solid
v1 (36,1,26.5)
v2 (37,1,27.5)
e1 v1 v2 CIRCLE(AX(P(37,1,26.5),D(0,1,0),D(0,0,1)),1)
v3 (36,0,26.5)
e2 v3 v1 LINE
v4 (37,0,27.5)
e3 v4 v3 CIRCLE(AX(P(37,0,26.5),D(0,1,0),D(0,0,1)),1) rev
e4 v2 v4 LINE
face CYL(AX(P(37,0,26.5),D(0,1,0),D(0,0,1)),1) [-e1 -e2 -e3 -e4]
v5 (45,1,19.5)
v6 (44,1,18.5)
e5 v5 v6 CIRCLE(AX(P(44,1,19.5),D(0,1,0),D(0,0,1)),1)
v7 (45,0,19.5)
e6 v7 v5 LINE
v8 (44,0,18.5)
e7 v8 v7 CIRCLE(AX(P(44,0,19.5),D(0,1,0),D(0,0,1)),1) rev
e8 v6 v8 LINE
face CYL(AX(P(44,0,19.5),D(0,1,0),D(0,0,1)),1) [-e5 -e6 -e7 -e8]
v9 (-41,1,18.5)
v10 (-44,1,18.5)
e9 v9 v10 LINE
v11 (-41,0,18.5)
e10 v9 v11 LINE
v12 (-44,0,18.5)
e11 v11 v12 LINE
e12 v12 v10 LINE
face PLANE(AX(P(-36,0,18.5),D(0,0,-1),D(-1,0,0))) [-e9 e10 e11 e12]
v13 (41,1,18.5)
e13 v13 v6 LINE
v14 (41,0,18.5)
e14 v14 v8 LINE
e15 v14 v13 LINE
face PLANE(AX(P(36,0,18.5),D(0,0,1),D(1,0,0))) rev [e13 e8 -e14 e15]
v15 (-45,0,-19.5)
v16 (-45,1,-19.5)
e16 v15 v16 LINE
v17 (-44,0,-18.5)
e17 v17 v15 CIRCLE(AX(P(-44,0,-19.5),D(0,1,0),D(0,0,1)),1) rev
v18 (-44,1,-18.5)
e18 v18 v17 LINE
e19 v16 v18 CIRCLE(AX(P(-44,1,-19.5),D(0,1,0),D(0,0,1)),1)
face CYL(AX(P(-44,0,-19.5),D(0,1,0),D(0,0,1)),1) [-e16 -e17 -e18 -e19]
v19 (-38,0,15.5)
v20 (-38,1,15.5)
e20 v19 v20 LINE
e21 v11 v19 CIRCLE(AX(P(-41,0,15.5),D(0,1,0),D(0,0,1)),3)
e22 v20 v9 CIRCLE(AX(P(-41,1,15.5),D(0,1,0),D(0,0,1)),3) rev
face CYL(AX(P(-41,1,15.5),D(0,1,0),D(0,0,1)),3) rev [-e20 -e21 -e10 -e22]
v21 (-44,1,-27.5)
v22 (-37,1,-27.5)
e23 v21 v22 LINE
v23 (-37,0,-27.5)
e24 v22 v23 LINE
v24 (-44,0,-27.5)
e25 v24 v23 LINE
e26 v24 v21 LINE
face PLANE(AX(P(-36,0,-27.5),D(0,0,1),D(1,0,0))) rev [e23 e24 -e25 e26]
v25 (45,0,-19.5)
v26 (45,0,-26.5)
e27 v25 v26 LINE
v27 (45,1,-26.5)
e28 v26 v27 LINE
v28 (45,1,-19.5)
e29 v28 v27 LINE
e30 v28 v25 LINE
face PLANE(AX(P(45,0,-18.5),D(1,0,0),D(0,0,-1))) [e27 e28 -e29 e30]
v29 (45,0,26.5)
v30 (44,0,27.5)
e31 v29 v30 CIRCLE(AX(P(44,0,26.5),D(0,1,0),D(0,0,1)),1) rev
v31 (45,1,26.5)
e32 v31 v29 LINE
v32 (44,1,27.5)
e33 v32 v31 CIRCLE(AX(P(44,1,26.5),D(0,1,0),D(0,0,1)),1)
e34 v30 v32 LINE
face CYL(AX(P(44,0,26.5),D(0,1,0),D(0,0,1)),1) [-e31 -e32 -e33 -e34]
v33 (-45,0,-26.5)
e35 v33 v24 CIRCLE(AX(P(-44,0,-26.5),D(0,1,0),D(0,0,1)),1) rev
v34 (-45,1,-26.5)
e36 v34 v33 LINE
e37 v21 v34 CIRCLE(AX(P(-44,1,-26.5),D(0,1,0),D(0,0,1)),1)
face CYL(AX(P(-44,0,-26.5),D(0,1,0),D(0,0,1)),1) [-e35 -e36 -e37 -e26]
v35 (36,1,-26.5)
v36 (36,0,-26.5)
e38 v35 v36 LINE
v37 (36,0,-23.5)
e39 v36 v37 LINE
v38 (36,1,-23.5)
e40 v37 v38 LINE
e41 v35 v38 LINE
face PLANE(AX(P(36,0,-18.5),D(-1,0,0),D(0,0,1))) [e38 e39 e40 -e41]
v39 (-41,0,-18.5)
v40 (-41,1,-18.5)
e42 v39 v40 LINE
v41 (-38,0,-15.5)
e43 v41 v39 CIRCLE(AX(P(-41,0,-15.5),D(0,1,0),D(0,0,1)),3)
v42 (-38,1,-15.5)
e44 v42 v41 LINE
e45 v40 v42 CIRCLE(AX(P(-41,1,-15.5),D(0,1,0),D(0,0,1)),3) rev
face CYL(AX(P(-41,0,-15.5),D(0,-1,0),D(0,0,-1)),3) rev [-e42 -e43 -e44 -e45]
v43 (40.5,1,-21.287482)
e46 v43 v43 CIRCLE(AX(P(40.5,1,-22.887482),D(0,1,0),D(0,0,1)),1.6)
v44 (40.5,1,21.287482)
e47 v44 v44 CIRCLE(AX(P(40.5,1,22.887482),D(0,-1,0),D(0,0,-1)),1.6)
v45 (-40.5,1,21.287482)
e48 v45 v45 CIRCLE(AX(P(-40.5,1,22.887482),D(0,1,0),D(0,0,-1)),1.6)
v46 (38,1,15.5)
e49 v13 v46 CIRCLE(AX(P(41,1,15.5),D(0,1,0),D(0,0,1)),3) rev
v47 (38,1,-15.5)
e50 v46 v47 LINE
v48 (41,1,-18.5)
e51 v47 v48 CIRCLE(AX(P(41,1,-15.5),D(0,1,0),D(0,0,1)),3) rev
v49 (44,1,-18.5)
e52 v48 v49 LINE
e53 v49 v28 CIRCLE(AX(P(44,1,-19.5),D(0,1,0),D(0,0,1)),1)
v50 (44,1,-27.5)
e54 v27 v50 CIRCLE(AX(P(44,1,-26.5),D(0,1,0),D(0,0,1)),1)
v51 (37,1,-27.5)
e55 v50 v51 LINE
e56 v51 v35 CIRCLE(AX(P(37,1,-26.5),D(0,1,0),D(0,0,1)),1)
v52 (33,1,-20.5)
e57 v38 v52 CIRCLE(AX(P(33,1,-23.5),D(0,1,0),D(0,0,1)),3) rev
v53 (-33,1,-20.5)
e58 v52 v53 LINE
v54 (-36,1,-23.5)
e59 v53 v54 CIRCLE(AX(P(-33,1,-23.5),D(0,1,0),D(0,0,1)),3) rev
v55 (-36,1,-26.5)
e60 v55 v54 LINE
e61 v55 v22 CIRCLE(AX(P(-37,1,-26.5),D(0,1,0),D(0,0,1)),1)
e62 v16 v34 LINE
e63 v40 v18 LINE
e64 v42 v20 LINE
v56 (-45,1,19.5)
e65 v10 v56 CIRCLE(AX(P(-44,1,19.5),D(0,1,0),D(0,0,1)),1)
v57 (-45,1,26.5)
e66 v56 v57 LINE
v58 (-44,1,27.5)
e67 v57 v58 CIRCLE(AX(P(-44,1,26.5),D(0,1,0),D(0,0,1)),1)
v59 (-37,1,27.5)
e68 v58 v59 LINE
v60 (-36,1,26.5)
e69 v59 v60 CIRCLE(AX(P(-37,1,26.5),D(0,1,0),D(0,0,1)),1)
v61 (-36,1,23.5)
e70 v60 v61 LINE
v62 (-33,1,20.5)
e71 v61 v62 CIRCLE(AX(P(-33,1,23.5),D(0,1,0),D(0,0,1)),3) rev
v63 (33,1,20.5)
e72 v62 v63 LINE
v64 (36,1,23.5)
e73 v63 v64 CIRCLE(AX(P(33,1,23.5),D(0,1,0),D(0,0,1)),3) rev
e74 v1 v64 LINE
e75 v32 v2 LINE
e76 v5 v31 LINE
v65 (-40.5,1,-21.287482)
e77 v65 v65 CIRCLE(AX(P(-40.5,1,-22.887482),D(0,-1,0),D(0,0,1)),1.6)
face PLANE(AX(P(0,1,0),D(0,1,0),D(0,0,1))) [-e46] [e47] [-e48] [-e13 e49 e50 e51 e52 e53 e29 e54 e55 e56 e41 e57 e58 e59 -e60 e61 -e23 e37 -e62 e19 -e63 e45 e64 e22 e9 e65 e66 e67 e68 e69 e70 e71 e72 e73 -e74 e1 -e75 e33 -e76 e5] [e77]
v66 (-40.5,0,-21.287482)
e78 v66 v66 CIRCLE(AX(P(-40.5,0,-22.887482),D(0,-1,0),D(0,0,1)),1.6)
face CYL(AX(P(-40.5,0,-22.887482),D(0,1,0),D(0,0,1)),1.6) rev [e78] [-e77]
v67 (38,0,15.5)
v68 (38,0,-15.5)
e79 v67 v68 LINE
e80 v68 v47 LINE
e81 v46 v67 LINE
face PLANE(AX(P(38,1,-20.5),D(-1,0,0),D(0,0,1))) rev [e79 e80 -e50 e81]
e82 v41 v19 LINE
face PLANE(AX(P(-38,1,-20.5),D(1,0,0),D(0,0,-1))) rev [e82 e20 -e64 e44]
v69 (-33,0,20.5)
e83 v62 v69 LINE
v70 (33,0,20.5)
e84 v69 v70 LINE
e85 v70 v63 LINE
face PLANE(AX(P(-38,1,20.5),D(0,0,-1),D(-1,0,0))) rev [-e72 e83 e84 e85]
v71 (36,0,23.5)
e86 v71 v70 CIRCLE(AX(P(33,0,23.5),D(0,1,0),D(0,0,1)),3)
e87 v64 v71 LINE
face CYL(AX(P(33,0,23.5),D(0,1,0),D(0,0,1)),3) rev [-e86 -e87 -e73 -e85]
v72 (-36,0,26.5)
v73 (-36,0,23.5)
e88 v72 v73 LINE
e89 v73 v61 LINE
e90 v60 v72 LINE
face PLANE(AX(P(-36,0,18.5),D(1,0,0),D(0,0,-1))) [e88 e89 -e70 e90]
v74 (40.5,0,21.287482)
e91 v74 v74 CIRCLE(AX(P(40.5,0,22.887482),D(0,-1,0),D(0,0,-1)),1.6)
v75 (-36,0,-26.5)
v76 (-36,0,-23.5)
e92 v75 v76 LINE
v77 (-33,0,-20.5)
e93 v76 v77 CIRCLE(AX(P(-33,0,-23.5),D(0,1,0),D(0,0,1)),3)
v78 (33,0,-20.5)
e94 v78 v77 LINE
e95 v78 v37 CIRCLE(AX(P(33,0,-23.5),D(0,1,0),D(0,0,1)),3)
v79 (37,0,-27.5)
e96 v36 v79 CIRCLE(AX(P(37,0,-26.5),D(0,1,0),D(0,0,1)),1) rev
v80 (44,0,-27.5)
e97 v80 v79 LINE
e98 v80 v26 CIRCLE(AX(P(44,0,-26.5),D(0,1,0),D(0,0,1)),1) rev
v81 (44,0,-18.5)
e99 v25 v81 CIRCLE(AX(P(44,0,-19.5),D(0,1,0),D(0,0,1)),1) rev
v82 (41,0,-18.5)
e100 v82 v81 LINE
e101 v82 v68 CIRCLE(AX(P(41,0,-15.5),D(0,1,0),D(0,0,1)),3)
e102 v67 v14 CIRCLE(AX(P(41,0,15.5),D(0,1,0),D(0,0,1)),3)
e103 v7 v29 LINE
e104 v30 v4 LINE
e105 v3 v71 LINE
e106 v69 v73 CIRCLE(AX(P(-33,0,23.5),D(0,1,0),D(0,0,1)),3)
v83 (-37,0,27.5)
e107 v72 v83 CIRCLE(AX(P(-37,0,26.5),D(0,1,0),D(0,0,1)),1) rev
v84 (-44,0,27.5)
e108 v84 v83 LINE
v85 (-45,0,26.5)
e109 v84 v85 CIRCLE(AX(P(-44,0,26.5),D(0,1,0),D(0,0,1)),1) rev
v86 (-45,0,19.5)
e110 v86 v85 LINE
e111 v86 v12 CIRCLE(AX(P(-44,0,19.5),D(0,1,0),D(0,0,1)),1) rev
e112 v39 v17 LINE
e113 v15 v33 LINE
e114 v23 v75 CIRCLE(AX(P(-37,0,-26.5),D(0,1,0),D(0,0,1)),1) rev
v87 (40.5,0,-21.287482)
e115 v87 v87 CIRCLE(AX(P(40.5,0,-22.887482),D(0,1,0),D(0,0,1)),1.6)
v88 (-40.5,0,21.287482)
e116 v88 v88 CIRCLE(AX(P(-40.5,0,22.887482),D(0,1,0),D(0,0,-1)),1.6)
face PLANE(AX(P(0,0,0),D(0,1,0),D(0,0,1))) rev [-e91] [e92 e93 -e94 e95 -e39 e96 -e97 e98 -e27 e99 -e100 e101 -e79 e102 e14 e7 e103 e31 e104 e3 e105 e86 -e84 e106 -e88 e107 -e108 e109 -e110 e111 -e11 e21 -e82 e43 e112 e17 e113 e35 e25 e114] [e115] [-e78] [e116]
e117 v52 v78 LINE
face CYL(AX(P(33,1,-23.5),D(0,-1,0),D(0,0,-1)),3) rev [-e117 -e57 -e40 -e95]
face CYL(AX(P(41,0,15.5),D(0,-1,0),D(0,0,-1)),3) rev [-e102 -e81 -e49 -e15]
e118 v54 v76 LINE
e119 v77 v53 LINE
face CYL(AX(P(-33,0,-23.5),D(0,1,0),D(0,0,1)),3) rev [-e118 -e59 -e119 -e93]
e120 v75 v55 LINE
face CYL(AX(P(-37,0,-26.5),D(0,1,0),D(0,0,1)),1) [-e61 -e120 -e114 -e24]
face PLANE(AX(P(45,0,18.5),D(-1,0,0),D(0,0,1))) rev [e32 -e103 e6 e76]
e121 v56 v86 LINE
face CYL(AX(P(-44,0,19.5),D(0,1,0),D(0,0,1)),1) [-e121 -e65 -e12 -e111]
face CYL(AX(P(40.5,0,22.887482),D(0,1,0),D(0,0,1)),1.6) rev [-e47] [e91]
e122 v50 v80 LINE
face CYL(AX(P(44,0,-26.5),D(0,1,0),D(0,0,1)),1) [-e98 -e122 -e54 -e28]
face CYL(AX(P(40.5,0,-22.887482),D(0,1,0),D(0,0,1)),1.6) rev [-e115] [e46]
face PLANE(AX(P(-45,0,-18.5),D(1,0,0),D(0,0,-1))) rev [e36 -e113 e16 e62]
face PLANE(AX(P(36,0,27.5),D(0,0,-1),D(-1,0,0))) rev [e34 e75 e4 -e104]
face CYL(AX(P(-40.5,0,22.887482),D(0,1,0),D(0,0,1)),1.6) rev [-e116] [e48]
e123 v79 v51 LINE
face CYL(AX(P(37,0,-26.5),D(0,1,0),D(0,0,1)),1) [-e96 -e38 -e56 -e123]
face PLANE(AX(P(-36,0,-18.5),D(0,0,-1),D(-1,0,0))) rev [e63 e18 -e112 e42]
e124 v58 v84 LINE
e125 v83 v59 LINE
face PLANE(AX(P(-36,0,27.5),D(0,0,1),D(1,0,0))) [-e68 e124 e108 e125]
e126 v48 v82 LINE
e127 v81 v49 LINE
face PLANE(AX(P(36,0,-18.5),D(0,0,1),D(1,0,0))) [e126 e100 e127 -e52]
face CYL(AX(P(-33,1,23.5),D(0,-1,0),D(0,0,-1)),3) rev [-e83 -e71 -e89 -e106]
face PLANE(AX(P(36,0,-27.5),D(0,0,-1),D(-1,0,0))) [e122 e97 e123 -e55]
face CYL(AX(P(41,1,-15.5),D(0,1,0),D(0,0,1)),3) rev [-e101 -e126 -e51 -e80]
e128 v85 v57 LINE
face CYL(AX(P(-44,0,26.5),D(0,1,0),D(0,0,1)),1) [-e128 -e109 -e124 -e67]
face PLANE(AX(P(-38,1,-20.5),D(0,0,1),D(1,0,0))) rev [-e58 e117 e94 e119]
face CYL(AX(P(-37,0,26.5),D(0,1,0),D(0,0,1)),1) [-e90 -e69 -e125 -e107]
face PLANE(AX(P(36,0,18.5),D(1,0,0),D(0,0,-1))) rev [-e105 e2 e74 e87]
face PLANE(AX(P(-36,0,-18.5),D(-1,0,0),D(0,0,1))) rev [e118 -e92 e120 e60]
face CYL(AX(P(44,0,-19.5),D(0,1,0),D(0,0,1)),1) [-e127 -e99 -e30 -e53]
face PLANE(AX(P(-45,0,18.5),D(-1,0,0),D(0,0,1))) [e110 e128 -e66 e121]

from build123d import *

# Parameters (mm, degrees)
SKETCH1_W            = 76
SKETCH1_H            = 41
BOSS_EXTRUDE1_DEPTH  = 1
SKETCH2_W            = 9
SKETCH2_H            = 9
BOSS_EXTRUDE2_DEPTH  = 1
SKETCH3_R            = 1.6
CUT_EXTRUDE1_DEPTH   = 1
FILLET1_R            = 1
FILLET3_R            = 3
FILLET1_OF_MIRROR2_R = 1
MIRROR3_OUTLINE_R    = 1.6
MIRROR3_DEPTH        = 1
FILLET4_R            = 3


# Read off the part's stored shape, not the designer's step: Mirror3
with BuildPart() as part:
    # Sketch1 → Boss-Extrude1 (new body)
    with BuildSketch(Plane(origin=(0, 0, 0), x_dir=(1, 0, 0), z_dir=(0, 1, 0))):
        Rectangle(SKETCH1_W, SKETCH1_H)
    boss_extrude1 = extrude(amount=BOSS_EXTRUDE1_DEPTH)

    # Sketch2 → Boss-Extrude2 (add)
    with BuildSketch(Plane(origin=(0, 1, 0), x_dir=(1, 0, 0), z_dir=(0, 1, 0))):
        with Locations((40.5, 23)):
            Rectangle(SKETCH2_W, SKETCH2_H)
    boss_extrude2 = extrude(amount=-BOSS_EXTRUDE2_DEPTH)

    # Sketch3 → Cut-Extrude1 (cut)
    with BuildSketch(Plane(origin=(0, 1, 0), x_dir=(1, 0, 0), z_dir=(0, 1, 0))):
        with Locations(Location((40.5, 22.887482194, 0), (0, 0, 270))):
            Circle(SKETCH3_R)
    cut_extrude1 = extrude(amount=-CUT_EXTRUDE1_DEPTH, mode=Mode.SUBTRACT)

    # Fillet1
    fillet1_edges = [part.edges().sort_by_distance(p)[0] for p in [
        (45, 0.5, -18.5),
        (36, 0.5, -27.5),
        (45, 0.5, -27.5),
    ]]
    fillet(fillet1_edges, radius=FILLET1_R)

    # Fillet3
    fillet3_edges = [part.edges().sort_by_distance(p)[0] for p in [
        (36, 0.5, -20.5),
        (38, 0.5, -18.5),
    ]]
    fillet(fillet3_edges, radius=FILLET3_R)

    # Mirror2: Boss-Extrude1, Boss-Extrude2, Cut-Extrude1 across plane
    add(boss_extrude1.mirror(Plane.XY))
    add(boss_extrude2.mirror(Plane.XY))
    add(cut_extrude1.mirror(Plane.XY), mode=Mode.SUBTRACT)

    # Fillet1 of Mirror2
    fillet1_of_mirror2_edges = [part.edges().sort_by_distance(p)[0] for p in [
        (45, 0.5, 18.5),
        (36, 0.5, 27.5),
        (45, 0.5, 27.5),
    ]]
    fillet(fillet1_of_mirror2_edges, radius=FILLET1_OF_MIRROR2_R)

    # Mirror3 outline → Mirror3 (add)
    # profile 1 of 2: a face of its own
    with BuildSketch(Plane(origin=(0, 0, 0), x_dir=(1, 0, 0), z_dir=(0, 1, 0))):
        with BuildLine():
            Line((-38, -20.5), (-38, -18.5))
            Line((-38, -18.5), (-44, -18.5))
            ThreePointArc((-44, -18.5), (-44.707106781, -18.792893219), (-45, -19.5))
            Line((-45, -19.5), (-45, -26.5))
            ThreePointArc((-45, -26.5), (-44.707106781, -27.207106781), (-44, -27.5))
            Line((-44, -27.5), (-37, -27.5))
            ThreePointArc((-37, -27.5), (-36.292893219, -27.207106781), (-36, -26.5))
            Line((-36, -26.5), (-36, -20.5))
            Line((-36, -20.5), (-38, -20.5))
        make_face()
        with Locations((-40.5, -22.887482194)):
            Circle(MIRROR3_OUTLINE_R, mode=Mode.SUBTRACT)
    # profile 2 of 2: a face of its own
    with BuildSketch(Plane(origin=(0, 0, 0), x_dir=(1, 0, 0), z_dir=(0, 1, 0))):
        with BuildLine():
            Line((-44, 18.5), (-38, 18.5))
            Line((-38, 18.5), (-38, 20.5))
            Line((-38, 20.5), (-36, 20.5))
            Line((-36, 20.5), (-36, 26.5))
            ThreePointArc((-36, 26.5), (-36.292893219, 27.207106781), (-37, 27.5))
            Line((-37, 27.5), (-44, 27.5))
            ThreePointArc((-44, 27.5), (-44.707106781, 27.207106781), (-45, 26.5))
            Line((-45, 26.5), (-45, 19.5))
            ThreePointArc((-45, 19.5), (-44.707106781, 18.792893219), (-44, 18.5))
        make_face()
        with Locations((-40.5, 22.887482194)):
            Circle(MIRROR3_OUTLINE_R, mode=Mode.SUBTRACT)
    extrude(amount=MIRROR3_DEPTH)

    # Fillet4
    fillet4_edges = [part.edges().sort_by_distance(p)[0] for p in [
        (-36, 0.5, 20.5),
        (-38, 0.5, 18.5),
        (-36, 0.5, -20.5),
        (-38, 0.5, -18.5),
        (36, 0.5, 20.5),
        (38, 0.5, 18.5),
    ]]
    fillet(fillet4_edges, radius=FILLET4_R)


solid = part.part
